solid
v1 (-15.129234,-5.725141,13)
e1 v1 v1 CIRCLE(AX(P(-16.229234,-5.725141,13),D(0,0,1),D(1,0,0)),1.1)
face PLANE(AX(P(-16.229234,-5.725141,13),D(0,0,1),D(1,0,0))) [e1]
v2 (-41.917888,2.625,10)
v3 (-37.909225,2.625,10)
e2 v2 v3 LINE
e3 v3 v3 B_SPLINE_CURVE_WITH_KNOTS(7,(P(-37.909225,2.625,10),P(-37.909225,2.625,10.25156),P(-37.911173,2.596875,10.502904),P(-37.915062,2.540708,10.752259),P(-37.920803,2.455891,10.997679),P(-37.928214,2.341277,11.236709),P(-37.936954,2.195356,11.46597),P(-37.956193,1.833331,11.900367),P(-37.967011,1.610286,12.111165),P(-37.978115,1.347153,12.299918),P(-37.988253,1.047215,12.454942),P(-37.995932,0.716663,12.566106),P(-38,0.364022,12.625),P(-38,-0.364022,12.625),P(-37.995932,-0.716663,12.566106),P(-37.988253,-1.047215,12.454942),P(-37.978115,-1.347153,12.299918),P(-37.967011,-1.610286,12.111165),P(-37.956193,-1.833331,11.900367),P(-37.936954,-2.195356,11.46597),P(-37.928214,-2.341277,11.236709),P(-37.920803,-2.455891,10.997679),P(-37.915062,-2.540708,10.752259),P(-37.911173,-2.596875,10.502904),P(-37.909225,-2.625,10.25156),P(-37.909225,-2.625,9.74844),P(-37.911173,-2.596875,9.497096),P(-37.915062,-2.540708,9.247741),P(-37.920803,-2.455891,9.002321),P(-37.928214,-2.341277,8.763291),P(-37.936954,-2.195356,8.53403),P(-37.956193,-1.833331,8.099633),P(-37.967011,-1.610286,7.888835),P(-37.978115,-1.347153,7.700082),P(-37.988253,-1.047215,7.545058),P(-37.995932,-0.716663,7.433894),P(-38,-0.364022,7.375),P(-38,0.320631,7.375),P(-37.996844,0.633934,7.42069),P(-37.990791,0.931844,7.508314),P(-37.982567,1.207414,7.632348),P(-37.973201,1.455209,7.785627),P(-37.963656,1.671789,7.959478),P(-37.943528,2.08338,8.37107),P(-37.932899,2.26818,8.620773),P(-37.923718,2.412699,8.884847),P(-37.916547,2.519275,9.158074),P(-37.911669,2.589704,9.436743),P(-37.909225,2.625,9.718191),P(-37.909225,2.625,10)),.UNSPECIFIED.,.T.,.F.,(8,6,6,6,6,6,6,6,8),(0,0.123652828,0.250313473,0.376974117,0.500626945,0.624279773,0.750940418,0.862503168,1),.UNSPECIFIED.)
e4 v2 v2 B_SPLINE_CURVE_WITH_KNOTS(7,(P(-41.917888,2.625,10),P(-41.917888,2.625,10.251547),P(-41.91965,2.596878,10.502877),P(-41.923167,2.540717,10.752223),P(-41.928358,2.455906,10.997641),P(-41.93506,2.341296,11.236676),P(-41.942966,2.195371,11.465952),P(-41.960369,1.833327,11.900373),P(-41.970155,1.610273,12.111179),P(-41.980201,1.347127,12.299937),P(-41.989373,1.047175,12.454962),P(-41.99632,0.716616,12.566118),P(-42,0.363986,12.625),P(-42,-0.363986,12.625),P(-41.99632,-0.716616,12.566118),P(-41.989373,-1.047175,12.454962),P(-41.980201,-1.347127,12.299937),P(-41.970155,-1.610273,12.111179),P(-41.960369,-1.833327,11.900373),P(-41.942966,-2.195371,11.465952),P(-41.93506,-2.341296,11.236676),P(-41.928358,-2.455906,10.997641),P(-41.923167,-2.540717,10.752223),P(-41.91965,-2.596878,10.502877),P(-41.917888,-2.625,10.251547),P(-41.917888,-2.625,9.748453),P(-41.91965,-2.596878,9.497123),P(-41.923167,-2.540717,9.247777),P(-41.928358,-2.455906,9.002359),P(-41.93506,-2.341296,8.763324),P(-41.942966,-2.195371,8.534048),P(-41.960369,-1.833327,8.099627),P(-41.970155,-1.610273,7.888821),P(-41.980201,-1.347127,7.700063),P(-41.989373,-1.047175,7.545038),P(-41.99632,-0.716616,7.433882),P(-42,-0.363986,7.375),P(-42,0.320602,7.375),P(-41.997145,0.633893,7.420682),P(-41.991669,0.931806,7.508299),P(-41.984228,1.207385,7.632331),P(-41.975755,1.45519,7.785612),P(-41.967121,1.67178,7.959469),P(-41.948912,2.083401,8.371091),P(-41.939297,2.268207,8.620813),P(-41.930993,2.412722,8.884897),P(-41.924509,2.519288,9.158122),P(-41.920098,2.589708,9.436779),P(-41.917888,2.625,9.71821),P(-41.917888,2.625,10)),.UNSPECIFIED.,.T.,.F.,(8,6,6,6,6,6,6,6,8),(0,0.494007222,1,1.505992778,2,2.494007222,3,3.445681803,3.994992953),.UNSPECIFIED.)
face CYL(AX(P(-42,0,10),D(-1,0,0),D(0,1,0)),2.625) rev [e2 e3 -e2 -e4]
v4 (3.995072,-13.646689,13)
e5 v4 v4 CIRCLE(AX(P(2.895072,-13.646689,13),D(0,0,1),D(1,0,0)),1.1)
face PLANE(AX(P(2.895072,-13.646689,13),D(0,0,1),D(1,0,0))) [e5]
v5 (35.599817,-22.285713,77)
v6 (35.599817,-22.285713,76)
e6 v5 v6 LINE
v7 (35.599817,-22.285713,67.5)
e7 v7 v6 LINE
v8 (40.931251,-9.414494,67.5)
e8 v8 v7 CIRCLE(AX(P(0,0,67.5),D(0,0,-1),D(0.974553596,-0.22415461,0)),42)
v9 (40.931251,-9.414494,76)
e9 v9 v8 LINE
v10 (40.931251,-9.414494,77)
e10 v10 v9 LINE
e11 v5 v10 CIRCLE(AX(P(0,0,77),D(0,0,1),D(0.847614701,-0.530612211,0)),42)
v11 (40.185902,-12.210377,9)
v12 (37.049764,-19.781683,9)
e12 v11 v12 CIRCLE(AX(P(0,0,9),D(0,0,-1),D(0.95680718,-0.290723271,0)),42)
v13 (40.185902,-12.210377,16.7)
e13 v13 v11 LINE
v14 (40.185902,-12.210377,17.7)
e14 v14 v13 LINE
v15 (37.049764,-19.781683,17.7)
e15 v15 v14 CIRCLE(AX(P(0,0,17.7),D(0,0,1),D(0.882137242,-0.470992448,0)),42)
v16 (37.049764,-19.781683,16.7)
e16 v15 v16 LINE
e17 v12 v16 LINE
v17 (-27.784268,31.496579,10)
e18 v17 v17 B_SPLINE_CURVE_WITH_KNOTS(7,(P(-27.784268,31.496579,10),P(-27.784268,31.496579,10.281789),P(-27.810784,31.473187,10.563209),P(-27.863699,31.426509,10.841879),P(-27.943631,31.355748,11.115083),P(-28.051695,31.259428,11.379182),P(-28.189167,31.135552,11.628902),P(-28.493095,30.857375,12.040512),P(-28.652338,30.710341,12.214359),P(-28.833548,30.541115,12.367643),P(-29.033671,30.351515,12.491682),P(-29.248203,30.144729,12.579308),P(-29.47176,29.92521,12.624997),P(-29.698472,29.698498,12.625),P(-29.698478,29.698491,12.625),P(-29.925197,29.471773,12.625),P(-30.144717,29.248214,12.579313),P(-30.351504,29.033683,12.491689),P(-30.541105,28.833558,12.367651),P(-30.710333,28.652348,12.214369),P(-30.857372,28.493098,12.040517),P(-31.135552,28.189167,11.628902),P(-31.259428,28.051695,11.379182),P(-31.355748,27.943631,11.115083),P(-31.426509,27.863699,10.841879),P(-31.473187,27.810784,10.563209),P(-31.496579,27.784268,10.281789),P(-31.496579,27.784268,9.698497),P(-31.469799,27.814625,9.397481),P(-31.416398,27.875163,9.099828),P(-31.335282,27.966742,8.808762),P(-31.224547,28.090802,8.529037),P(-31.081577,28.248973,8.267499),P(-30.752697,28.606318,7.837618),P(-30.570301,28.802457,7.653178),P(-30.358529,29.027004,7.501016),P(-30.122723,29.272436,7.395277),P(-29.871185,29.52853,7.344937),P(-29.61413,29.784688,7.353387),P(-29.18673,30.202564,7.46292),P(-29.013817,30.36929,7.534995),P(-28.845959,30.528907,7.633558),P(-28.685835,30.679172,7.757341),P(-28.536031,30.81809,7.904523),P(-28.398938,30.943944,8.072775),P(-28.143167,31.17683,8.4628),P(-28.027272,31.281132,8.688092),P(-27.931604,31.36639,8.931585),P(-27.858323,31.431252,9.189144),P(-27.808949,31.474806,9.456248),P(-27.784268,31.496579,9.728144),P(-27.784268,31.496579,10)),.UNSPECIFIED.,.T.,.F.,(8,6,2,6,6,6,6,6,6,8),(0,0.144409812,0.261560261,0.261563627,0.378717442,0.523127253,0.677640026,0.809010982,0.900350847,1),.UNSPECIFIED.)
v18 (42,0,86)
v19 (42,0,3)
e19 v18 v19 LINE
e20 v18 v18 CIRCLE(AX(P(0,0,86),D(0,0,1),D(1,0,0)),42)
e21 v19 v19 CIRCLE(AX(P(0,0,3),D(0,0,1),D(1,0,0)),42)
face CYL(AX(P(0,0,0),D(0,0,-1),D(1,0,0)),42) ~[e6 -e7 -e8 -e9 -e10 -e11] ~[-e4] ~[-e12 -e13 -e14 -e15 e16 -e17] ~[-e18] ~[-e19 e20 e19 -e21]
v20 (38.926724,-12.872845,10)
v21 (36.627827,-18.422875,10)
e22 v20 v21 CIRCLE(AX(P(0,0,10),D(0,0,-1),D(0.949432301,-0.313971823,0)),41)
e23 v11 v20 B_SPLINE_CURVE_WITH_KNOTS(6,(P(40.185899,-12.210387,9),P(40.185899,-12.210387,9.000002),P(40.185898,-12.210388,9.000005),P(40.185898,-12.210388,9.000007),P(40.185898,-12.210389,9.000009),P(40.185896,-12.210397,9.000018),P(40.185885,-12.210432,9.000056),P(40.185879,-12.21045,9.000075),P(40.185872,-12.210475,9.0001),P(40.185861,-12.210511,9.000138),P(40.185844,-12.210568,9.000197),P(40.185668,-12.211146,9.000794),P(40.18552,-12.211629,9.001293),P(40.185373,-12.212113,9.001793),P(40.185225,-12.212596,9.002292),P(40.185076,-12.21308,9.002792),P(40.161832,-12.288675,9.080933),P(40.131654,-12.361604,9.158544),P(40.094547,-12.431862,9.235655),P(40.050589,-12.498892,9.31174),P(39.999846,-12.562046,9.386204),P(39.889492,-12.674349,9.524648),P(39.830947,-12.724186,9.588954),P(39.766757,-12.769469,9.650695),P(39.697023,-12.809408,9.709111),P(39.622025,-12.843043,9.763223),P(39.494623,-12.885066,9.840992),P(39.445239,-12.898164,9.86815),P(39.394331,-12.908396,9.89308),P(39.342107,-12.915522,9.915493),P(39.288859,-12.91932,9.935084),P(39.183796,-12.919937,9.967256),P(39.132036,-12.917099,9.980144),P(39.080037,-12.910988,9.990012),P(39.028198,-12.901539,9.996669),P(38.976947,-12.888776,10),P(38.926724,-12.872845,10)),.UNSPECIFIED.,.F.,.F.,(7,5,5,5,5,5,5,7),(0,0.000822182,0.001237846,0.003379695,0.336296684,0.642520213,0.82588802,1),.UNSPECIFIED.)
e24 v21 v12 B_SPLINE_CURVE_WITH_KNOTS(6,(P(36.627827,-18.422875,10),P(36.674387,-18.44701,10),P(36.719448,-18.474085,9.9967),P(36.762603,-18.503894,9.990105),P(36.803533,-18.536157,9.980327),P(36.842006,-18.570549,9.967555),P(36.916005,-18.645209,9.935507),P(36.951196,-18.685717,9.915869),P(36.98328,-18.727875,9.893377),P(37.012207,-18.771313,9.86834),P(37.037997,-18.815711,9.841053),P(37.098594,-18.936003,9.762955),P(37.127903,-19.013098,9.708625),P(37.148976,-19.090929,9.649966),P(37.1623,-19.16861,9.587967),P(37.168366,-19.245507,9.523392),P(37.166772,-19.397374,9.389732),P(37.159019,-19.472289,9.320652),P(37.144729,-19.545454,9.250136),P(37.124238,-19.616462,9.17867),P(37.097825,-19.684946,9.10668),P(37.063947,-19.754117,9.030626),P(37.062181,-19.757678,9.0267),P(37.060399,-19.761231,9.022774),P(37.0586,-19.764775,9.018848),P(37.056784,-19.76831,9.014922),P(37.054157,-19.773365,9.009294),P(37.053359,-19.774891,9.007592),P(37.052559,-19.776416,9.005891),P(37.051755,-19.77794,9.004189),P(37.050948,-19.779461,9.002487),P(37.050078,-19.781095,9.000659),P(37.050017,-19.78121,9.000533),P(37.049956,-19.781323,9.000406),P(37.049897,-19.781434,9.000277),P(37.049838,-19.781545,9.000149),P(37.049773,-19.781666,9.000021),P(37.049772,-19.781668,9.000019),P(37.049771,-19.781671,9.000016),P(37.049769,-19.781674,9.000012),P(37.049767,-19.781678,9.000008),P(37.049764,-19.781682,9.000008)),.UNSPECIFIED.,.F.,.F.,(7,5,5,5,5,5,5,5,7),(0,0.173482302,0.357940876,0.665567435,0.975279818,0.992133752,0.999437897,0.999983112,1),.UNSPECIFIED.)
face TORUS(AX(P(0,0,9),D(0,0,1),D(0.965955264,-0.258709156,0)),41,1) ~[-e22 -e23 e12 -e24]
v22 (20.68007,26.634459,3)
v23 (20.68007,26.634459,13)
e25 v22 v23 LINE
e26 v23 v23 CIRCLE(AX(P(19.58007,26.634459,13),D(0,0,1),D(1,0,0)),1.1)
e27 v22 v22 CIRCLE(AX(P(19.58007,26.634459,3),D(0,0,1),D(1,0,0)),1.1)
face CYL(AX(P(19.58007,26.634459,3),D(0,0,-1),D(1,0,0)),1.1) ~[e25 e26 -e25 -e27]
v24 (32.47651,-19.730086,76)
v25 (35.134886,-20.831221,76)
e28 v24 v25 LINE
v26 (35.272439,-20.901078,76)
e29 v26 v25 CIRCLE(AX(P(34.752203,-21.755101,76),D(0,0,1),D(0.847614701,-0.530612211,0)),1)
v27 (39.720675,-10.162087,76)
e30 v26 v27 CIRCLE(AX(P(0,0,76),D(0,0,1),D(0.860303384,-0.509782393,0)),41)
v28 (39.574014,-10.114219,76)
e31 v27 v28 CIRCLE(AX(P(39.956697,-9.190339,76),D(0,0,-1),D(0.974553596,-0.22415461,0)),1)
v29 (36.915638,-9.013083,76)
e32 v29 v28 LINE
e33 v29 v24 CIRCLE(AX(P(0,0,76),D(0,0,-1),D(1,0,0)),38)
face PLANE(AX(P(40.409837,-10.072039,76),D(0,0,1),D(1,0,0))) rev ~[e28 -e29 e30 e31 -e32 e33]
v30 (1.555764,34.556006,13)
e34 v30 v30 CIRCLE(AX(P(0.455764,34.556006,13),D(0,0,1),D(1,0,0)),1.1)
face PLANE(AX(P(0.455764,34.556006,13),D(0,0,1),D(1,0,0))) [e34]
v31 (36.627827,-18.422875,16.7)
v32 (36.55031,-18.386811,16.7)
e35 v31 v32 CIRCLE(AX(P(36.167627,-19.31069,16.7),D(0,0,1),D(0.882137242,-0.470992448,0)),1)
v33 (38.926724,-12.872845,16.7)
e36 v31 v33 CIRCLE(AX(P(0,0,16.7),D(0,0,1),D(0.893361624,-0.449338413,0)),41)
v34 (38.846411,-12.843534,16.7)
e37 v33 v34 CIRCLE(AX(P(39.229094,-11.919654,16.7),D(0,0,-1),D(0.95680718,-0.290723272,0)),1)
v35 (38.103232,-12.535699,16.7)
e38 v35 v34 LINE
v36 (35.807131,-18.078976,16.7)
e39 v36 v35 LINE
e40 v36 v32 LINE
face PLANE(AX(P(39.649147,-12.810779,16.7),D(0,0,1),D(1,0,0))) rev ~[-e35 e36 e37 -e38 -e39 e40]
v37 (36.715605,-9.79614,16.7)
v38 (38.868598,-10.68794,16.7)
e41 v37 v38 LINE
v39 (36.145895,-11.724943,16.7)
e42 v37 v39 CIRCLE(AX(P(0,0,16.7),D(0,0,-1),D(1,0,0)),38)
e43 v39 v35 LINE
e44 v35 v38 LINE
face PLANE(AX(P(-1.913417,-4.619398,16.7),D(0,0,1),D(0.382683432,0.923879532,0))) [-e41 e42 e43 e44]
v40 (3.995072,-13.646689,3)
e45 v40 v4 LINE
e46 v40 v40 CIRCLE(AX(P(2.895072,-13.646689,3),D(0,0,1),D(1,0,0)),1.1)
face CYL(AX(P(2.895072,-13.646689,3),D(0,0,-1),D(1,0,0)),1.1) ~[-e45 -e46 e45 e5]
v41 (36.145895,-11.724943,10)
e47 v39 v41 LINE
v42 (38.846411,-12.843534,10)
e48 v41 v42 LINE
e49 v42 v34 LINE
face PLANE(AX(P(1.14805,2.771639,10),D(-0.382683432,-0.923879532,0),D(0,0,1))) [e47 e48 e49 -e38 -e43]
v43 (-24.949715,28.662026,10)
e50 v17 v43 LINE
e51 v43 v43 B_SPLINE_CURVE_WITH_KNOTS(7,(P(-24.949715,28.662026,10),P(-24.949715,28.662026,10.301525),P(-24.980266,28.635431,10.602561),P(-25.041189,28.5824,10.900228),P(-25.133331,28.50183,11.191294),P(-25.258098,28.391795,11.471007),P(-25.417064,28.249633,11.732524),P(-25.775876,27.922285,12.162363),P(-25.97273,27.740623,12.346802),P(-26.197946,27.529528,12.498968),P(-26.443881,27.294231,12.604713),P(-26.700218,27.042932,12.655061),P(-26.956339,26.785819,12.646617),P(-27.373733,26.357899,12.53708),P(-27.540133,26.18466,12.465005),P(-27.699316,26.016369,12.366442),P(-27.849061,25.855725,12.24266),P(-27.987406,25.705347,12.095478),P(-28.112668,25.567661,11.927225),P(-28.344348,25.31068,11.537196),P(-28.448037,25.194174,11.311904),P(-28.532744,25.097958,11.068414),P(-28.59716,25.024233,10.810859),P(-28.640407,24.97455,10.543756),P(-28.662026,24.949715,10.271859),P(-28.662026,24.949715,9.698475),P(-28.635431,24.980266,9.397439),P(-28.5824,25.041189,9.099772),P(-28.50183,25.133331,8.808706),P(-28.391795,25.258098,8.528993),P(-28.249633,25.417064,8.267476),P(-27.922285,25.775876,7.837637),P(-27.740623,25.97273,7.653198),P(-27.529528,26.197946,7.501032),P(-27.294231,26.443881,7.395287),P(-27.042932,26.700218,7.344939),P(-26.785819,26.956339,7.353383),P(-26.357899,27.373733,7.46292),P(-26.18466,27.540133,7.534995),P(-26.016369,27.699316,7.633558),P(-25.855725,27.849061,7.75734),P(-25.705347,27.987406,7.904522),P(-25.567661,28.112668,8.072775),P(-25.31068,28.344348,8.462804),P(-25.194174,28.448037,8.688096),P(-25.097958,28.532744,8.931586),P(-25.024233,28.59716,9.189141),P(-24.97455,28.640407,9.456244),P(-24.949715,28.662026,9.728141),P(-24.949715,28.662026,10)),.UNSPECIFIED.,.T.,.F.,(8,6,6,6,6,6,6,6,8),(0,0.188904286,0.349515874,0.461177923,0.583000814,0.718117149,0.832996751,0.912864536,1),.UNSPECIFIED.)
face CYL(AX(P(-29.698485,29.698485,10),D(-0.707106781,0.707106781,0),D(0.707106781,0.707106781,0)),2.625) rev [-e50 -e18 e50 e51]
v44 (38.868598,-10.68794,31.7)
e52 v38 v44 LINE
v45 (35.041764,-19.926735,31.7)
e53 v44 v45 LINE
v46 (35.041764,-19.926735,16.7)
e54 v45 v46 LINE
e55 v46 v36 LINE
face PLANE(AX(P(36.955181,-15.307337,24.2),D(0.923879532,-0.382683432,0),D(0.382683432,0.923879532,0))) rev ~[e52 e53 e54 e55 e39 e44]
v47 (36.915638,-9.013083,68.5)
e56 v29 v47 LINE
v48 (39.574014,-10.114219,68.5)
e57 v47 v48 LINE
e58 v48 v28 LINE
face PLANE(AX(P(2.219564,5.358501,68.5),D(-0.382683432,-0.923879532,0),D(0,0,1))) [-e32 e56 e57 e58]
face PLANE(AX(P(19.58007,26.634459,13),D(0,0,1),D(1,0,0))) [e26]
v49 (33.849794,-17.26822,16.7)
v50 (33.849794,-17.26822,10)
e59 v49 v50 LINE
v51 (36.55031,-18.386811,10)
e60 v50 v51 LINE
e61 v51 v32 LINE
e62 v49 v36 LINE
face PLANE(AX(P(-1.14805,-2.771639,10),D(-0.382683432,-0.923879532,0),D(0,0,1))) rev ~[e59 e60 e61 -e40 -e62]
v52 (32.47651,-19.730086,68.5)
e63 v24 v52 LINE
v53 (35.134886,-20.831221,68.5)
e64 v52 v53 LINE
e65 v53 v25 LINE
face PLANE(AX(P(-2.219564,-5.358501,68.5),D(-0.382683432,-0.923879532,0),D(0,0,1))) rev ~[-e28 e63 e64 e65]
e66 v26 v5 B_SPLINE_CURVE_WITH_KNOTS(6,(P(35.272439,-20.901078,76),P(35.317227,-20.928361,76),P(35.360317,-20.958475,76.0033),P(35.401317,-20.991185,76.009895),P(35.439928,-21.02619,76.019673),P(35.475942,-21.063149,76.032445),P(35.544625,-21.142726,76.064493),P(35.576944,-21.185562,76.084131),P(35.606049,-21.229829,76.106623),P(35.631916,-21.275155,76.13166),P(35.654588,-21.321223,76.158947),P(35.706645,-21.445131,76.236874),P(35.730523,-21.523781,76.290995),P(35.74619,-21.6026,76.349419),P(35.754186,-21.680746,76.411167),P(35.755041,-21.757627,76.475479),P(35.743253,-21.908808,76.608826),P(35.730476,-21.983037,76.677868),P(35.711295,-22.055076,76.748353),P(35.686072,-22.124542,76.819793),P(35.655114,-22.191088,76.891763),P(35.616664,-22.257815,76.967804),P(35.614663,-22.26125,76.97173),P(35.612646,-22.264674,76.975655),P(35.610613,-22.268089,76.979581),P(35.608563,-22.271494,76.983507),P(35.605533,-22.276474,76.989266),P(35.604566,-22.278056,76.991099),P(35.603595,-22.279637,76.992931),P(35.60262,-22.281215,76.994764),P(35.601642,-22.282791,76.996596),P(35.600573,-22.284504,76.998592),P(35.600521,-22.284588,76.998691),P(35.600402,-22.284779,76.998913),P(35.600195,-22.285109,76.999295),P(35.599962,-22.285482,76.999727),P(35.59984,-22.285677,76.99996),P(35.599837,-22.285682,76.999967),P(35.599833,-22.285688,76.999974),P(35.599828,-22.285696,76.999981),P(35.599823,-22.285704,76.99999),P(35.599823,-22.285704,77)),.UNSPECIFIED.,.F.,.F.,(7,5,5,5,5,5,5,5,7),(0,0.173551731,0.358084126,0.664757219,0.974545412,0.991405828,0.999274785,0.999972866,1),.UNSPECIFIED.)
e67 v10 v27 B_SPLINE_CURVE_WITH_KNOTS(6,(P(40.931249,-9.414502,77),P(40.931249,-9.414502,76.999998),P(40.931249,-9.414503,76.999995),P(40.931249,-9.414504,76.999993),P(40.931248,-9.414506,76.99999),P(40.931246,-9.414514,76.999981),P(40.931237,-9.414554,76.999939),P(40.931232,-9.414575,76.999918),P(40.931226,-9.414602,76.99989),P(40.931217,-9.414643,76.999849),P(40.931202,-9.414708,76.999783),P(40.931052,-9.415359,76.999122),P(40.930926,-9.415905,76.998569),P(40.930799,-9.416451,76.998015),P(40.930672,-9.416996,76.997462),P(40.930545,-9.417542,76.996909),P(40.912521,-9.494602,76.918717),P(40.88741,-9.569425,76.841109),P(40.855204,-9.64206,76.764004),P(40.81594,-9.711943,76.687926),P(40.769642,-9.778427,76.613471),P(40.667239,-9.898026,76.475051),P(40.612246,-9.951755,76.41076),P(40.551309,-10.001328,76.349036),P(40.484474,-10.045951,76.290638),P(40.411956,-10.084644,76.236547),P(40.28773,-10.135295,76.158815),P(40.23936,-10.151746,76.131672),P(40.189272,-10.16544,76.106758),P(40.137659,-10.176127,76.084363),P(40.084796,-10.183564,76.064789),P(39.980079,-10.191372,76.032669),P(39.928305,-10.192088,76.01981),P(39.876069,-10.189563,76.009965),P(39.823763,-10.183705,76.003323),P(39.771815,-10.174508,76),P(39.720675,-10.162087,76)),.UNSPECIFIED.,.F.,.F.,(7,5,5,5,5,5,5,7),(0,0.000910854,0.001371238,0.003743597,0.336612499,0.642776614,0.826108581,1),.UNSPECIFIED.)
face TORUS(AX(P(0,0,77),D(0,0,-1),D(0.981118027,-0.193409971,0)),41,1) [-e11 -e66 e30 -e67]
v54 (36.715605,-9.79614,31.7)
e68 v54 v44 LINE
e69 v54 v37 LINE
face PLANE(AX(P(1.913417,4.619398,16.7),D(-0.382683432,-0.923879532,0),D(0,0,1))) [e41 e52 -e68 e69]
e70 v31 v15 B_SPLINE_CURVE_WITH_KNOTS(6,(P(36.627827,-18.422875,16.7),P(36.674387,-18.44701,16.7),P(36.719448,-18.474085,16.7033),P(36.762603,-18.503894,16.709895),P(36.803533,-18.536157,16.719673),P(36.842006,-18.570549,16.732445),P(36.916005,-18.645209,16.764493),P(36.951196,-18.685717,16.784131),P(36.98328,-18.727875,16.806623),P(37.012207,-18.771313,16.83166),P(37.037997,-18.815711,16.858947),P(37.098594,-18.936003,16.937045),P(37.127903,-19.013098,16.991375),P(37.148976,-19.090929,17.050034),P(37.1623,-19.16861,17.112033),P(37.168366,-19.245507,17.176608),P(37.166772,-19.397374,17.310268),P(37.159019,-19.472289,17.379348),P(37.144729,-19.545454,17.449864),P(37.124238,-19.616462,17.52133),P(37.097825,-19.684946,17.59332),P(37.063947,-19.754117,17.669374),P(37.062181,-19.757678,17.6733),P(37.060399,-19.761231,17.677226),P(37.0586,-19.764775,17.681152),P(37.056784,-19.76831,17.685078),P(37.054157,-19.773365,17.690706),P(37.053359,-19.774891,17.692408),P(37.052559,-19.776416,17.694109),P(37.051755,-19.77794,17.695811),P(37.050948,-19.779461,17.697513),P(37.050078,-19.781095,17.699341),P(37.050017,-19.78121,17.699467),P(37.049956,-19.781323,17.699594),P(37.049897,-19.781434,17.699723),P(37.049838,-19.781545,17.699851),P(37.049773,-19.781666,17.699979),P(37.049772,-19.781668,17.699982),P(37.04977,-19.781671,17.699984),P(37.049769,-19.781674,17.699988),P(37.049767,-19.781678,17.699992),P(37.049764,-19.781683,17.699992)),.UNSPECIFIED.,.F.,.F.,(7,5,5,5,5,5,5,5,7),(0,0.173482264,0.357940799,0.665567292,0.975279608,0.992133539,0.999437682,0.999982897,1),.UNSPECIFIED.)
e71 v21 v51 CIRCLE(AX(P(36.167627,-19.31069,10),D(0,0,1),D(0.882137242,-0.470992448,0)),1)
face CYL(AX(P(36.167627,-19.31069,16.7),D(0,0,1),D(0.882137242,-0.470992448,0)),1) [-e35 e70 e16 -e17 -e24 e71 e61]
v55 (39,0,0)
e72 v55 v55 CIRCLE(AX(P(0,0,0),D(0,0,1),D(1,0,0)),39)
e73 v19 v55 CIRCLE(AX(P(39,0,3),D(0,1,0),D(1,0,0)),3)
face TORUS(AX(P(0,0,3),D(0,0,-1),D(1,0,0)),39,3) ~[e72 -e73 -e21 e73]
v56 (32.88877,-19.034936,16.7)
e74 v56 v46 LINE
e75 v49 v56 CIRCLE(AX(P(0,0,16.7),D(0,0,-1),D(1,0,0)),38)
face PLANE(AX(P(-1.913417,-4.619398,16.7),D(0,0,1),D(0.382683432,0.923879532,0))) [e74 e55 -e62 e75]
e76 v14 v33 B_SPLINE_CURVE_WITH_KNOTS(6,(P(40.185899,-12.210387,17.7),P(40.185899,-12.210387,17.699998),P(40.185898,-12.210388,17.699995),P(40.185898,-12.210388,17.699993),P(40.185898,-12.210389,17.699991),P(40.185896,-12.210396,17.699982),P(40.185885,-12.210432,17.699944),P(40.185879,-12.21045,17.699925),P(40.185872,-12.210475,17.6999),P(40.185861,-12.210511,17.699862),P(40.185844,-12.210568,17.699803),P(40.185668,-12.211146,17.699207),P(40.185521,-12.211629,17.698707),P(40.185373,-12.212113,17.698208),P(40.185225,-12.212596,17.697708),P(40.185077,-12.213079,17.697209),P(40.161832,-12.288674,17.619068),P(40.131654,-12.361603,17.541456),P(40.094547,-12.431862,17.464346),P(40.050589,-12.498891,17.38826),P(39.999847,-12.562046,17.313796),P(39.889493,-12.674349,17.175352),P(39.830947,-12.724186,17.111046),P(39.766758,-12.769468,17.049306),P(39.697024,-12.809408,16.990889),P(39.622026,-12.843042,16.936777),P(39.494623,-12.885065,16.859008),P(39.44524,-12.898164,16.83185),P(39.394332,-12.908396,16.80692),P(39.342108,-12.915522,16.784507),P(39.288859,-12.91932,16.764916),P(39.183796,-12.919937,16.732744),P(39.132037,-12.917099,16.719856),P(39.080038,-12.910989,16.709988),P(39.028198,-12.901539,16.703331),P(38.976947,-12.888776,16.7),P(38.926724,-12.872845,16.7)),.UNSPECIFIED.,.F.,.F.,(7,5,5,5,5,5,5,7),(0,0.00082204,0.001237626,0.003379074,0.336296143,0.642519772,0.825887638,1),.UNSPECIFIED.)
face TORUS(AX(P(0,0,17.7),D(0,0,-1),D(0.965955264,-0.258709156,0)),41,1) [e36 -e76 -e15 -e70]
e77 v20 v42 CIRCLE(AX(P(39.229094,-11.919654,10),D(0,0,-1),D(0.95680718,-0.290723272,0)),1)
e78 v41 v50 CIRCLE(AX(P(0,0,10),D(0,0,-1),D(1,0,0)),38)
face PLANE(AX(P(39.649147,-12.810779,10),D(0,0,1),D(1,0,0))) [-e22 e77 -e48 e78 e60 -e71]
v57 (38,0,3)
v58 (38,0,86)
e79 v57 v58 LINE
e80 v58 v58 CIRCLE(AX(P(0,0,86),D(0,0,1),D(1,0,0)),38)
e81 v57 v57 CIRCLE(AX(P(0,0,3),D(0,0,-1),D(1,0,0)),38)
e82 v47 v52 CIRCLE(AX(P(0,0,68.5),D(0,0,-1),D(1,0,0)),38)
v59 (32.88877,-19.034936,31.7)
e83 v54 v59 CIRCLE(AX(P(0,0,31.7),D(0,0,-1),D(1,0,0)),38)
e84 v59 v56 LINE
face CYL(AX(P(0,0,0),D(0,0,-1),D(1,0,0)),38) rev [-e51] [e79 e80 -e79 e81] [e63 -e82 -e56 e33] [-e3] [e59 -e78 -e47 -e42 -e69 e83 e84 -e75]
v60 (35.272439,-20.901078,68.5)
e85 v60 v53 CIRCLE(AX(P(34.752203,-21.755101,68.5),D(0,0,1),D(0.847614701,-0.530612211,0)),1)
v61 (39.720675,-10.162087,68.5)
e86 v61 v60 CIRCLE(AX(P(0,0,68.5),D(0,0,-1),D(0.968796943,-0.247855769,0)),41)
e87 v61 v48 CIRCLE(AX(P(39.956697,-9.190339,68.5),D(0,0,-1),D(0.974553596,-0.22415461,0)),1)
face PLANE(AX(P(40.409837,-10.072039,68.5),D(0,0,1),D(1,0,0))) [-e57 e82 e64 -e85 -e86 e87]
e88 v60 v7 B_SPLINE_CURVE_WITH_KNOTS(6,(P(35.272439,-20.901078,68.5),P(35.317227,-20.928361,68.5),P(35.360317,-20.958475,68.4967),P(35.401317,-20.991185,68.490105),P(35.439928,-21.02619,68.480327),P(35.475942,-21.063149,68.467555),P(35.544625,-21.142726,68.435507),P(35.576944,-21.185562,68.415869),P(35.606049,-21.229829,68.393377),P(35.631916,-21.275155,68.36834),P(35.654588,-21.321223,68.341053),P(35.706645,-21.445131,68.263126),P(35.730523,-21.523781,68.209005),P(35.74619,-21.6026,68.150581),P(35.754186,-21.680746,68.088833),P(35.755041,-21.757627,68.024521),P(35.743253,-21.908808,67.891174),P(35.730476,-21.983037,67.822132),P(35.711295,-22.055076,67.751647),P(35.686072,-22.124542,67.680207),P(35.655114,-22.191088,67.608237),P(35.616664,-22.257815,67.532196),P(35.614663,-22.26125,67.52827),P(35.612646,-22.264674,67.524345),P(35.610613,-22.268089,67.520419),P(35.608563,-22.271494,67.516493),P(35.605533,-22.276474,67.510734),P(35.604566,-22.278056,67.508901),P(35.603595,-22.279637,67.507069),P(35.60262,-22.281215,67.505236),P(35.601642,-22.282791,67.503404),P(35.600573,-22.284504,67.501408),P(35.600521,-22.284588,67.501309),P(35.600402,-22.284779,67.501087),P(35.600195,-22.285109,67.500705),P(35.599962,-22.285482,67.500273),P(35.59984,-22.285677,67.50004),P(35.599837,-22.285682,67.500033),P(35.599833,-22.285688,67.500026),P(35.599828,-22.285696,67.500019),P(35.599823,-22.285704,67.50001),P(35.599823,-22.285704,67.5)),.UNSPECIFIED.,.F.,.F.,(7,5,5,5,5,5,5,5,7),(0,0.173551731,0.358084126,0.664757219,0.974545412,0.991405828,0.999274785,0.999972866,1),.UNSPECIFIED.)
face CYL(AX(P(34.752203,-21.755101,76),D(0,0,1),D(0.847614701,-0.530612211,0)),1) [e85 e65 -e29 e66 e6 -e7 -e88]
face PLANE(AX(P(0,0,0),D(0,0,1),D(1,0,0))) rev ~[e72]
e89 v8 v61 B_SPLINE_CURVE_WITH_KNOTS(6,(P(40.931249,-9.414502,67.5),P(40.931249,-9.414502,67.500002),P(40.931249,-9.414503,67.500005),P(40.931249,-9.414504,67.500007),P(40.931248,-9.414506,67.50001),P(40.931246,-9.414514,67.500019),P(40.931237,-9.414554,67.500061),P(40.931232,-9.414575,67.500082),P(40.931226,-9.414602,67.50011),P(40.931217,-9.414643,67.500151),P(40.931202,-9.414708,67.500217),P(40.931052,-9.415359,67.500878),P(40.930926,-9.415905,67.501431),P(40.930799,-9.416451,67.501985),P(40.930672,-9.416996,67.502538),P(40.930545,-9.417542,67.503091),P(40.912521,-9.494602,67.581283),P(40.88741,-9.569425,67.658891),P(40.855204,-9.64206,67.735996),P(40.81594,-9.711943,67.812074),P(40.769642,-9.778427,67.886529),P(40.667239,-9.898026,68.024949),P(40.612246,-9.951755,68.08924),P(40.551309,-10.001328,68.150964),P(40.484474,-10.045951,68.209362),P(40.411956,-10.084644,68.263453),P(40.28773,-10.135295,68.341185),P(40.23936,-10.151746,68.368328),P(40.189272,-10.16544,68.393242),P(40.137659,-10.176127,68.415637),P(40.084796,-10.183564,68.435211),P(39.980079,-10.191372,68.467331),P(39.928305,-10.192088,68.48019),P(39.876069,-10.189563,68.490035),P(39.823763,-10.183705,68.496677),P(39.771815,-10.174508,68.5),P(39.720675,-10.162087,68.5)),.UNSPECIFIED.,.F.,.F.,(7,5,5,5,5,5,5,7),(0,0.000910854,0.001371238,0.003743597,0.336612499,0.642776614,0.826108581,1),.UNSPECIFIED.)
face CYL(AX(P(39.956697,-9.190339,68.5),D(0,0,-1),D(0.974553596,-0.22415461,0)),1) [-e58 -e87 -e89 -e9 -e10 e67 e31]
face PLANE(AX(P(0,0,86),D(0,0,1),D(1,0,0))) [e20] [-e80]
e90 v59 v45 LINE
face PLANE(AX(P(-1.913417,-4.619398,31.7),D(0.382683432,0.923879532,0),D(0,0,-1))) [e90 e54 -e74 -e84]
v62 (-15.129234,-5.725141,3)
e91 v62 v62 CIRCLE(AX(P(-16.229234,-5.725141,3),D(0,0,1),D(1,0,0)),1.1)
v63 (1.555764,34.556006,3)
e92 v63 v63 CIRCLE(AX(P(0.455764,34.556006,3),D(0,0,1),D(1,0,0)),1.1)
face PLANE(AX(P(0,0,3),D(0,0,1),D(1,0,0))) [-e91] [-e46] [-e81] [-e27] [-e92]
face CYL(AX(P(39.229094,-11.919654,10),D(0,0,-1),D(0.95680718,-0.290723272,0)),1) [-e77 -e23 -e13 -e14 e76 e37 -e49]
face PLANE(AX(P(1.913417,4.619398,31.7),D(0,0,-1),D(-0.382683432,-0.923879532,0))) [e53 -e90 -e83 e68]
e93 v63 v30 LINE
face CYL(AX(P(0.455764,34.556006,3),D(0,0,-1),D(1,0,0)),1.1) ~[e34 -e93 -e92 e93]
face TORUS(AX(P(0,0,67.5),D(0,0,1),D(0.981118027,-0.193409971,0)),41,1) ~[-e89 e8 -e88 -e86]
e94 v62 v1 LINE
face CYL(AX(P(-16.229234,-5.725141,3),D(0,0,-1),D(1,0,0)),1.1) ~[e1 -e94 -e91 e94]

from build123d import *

# Parameters (mm, degrees)
F0_R           = 42
F0_R_2         = 38
F1_DEPTH       = 86
F2_DEPTH       = 3
F7_R           = 2.625
F8_DEPTH       = 4.0917746397
F9_R           = 2.625
F10_DEPTH      = 4.0917746397
F11_R          = 3
F14_W          = 11.6
F14_H          = 7.5
F14_W_2        = 6
F14_H_2        = 6.7
F15_DEPTH      = 54.8766446555
F16_R          = 1.1
F17_DEPTH      = 10
F18_T1_DEPTH   = 7.5
F18_T3_DEPTH   = 6.7
F18_T8_ANGLE   = 22.6962930478
F18_T14_ANGLE  = 22.6962930478
F18_T20_ANGLE  = 15.0130363442
F18_T26_ANGLE  = 15.0130363442
F18_T33_DEPTH  = 10.4488940484
F18_T37_ANGLE  = 22.6962930478
F18_T44_ANGLE  = 22.6962930478
F18_T48_DEPTH  = 10.4488940484
F18_T55_DEPTH  = 10.4488940484
F18_T59_ANGLE  = 22.6962930478
F18_T66_DEPTH  = 10.4488940484
F18_T70_ANGLE  = 22.6962930478
F18_T77_ANGLE  = 15.0130363442
F18_T81_DEPTH  = 9.4537517655
F18_T88_ANGLE  = 15.0130363442
F18_T92_DEPTH  = 9.4537517655
F18_T99_ANGLE  = 15.0130363442
F18_T103_DEPTH = 9.4537517655
F18_T110_DEPTH = 9.4537517655
F18_T114_ANGLE = 15.0130363442
F19_DEPTH      = 40


# Not quite as in the source:
# - a fillet or chamfer that OpenCascade refuses, or shapes differently, is made with other operations: its cross-section is extruded or revolved along the edge and cut away or added


with BuildPart() as f1:
    # F0 (on Top) → F1 (new body)
    with BuildSketch(Plane.XY):
        Circle(F0_R)
        Circle(F0_R_2, mode=Mode.SUBTRACT)
    extrude(amount=F1_DEPTH)

    # F0 (on Top) → F2 (join)
    with BuildSketch(Plane.XY):
        Circle(F0_R)
        Circle(F0_R_2, mode=Mode.SUBTRACT)
        Circle(F0_R_2)
    extrude(amount=F2_DEPTH)

    # F7 (on plane+point) → F8 (cut, through all)
    with BuildSketch(Plane.YZ.offset(-42)):
        with Locations((0, 10)):
            Circle(F7_R)
    extrude(amount=F8_DEPTH, mode=Mode.SUBTRACT)

    # F9 (on face) → F10 (cut, through all)
    with BuildSketch(Plane(origin=(-29.6984848098, 29.6984848098, 0), x_dir=(0.7071067812, 0.7071067812, 0), z_dir=(0.7071067812, -0.7071067812, 0))):
        with Locations((0, 10)):
            Circle(F9_R)
    extrude(amount=F10_DEPTH, mode=Mode.SUBTRACT)

    # F11
    f11_edges = [f1.edges().sort_by_distance(p)[0] for p in [
        (-42, 0, 0),
    ]]
    fillet(f11_edges, radius=F11_R)

    # F14 (on face) → F15 (cut, through all)
    with BuildSketch(Plane(origin=(0, 0, 0), x_dir=(0.3826834324, 0.9238795325, 0), z_dir=(0.9238795325, -0.3826834324, 0))):
        with Locations((0, 72.25)):
            Rectangle(F14_W, F14_H)
        with Locations((0, 13.35)):
            Rectangle(F14_W_2, F14_H_2)
    extrude(amount=F15_DEPTH, mode=Mode.SUBTRACT)

    # F16 (on face) → F17 (join)
    with BuildSketch(Plane.XY.offset(3)):
        with Locations((19.5800699423, 26.6344591071)):
            Circle(F16_R)
        with Locations((2.8950722912, -13.6466885104)):
            Circle(F16_R)
        with Locations((-16.2292340318, -5.7251414605)):
            Circle(F16_R)
        with Locations((0.4557636193, 34.556006157)):
            Circle(F16_R)
    extrude(amount=F17_DEPTH)

    # F18: fillet of radius 1 on 8 edges, made by hand

    # F18_s2 → F18_t1 (cut)
    with BuildSketch(Plane.XY.offset(68.5)):
        with BuildLine():
            ThreePointArc((35.5998174413, -22.2857128706), (35.7047230458, -21.4506255904), (35.1348861726, -20.8312211268))
            Line((35.1348861726, -20.8312211268), (36.2116037163, -21.2772121363))
            ThreePointArc((36.2116037163, -21.2772121363), (35.9092511841, -21.783610339), (35.5998174413, -22.2857128706))
        make_face()
        with BuildLine():
            ThreePointArc((40.9312510161, -9.4144936274), (40.4149346017, -10.0791689704), (39.5740139881, -10.1142185497))
            Line((39.5740139881, -10.1142185497), (40.6507315318, -10.5602095591))
            ThreePointArc((40.6507315318, -10.5602095591), (40.795013609, -9.9883364302), (40.9312510161, -9.4144936274))
        make_face()
    extrude(amount=F18_T1_DEPTH, mode=Mode.SUBTRACT)

    # F18_s4 → F18_t3 (cut)
    with BuildSketch(Plane.XY.offset(10)):
        with BuildLine():
            ThreePointArc((40.1859015546, -12.2103773999), (39.6564422799, -12.8237413852), (38.8464109423, -12.843533661))
            Line((38.8464109423, -12.843533661), (39.8518769876, -13.2600113334))
            ThreePointArc((39.8518769876, -13.2600113334), (40.0223304087, -12.7362894384), (40.1859015546, -12.2103773999))
        make_face()
        with BuildLine():
            ThreePointArc((37.0497641576, -19.781682837), (37.1090937475, -18.9735847602), (36.5503103481, -18.386810856))
            Line((36.5503103481, -18.386810856), (37.5557763934, -18.8032885285))
            ThreePointArc((37.5557763934, -18.8032885285), (37.3059778599, -19.2941446018), (37.0497641576, -19.781682837))
        make_face()
    extrude(amount=F18_T3_DEPTH, mode=Mode.SUBTRACT)


with BuildPart() as f18_tool6:
    # F18_s7 → F18_t8 (revolve)
    with BuildSketch(Plane(origin=(0, 0, 0), x_dir=(0, 0, 1), z_dir=(0.193409971, 0.9811180271, 0))):
        with BuildLine():
            ThreePointArc((67.5, 42), (68.2071067812, 41.7071067812), (68.5, 41))
            Line((68.5, 41), (68.5, 42))
            Line((68.5, 42), (67.5, 42))
        make_face()
    revolve(axis=Axis((0, 0, 68.5), (0, 0, -1)), revolution_arc=F18_T8_ANGLE)

    split(bisect_by=Plane(origin=(2.2195639077, 5.3585012886, 0), x_dir=(0, 0, 1), z_dir=(-0.3826834324, -0.9238795325, 0)), keep=Keep.TOP)

    split(bisect_by=Plane(origin=(-2.2195639077, -5.3585012886, 0), x_dir=(0, 0, 1), z_dir=(0.3826834324, 0.9238795325, 0)), keep=Keep.TOP)


with BuildPart() as f1_1:
    add(f1.part)

    # F18_t5: cut F18_tool6
    add(f18_tool6.part, mode=Mode.SUBTRACT)


with BuildPart() as f18_tool12:
    # F18_s13 → F18_t14 (revolve)
    with BuildSketch(Plane(origin=(0, 0, 0), x_dir=(0, 0, 1), z_dir=(0.193409971, 0.9811180271, 0))):
        with BuildLine():
            ThreePointArc((77, 42), (76.2928932188, 41.7071067812), (76, 41))
            Line((76, 41), (76, 42))
            Line((76, 42), (77, 42))
        make_face()
    revolve(axis=Axis((0, 0, 76), (0, 0, -1)), revolution_arc=F18_T14_ANGLE)

    split(bisect_by=Plane(origin=(2.2195639077, 5.3585012886, 0), x_dir=(0, 0, 1), z_dir=(-0.3826834324, -0.9238795325, 0)), keep=Keep.TOP)

    split(bisect_by=Plane(origin=(-2.2195639077, -5.3585012886, 0), x_dir=(0, 0, 1), z_dir=(0.3826834324, 0.9238795325, 0)), keep=Keep.TOP)


with BuildPart() as f1_2:
    add(f1_1.part)

    # F18_t11: cut F18_tool12
    add(f18_tool12.part, mode=Mode.SUBTRACT)


with BuildPart() as f18_tool18:
    # F18_s19 → F18_t20 (revolve)
    with BuildSketch(Plane(origin=(0, 0, 0), x_dir=(0, 0, 1), z_dir=(0.2587091563, 0.9659552642, 0))):
        with BuildLine():
            ThreePointArc((9, 42), (9.7071067812, 41.7071067812), (10, 41))
            Line((10, 41), (10, 42))
            Line((10, 42), (9, 42))
        make_face()
    revolve(axis=Axis((0, 0, 10), (0, 0, -1)), revolution_arc=F18_T20_ANGLE)

    split(bisect_by=Plane(origin=(1.1480502971, 2.7716385975, 0), x_dir=(0, 0, 1), z_dir=(-0.3826834324, -0.9238795325, 0)), keep=Keep.TOP)

    split(bisect_by=Plane(origin=(-1.1480502971, -2.7716385975, 0), x_dir=(0, 0, 1), z_dir=(0.3826834324, 0.9238795325, 0)), keep=Keep.TOP)


with BuildPart() as f1_3:
    add(f1_2.part)

    # F18_t17: cut F18_tool18
    add(f18_tool18.part, mode=Mode.SUBTRACT)


with BuildPart() as f18_tool24:
    # F18_s25 → F18_t26 (revolve)
    with BuildSketch(Plane(origin=(0, 0, 0), x_dir=(0, 0, 1), z_dir=(0.2587091563, 0.9659552642, 0))):
        with BuildLine():
            ThreePointArc((17.7, 42), (16.9928932188, 41.7071067812), (16.7, 41))
            Line((16.7, 41), (16.7, 42))
            Line((16.7, 42), (17.7, 42))
        make_face()
    revolve(axis=Axis((0, 0, 16.7), (0, 0, -1)), revolution_arc=F18_T26_ANGLE)

    split(bisect_by=Plane(origin=(-1.1480502971, -2.7716385975, 0), x_dir=(0, 0, 1), z_dir=(0.3826834324, 0.9238795325, 0)), keep=Keep.TOP)

    split(bisect_by=Plane(origin=(1.1480502971, 2.7716385975, 0), x_dir=(0, 0, 1), z_dir=(-0.3826834324, -0.9238795325, 0)), keep=Keep.TOP)


with BuildPart() as f1_4:
    add(f1_3.part)

    # F18_t23: cut F18_tool24
    add(f18_tool24.part, mode=Mode.SUBTRACT)


with BuildPart() as f18_tool31:
    # F18_s32 → F18_t33 (new body)
    with BuildSketch(Plane.XY.offset(76)):
        with BuildLine():
            ThreePointArc((40.9312510161, -9.4144936274), (40.4149346017, -10.0791689704), (39.5740139881, -10.1142185497))
            Line((39.5740139881, -10.1142185497), (40.6507315318, -10.5602095591))
            ThreePointArc((40.6507315318, -10.5602095591), (40.795013609, -9.9883364302), (40.9312510161, -9.4144936274))
        make_face()
    extrude(amount=-F18_T33_DEPTH)

    split(bisect_by=Plane.XY.offset(68.5), keep=Keep.BOTTOM)


with BuildPart() as f18_tool35:
    # F18_s36 → F18_t37 (revolve)
    with BuildSketch(Plane(origin=(0, 0, 0), x_dir=(0, 0, 1), z_dir=(0.193409971, 0.9811180271, 0))):
        with BuildLine():
            ThreePointArc((67.5, 42), (68.2071067812, 41.7071067812), (68.5, 41))
            Line((68.5, 41), (68.5, 42))
            Line((68.5, 42), (67.5, 42))
        make_face()
    revolve(axis=Axis((0, 0, 68.5), (0, 0, -1)), revolution_arc=F18_T37_ANGLE)

    split(bisect_by=Plane(origin=(2.2195639077, 5.3585012886, 0), x_dir=(0, 0, 1), z_dir=(0.3826834324, 0.9238795325, 0)), keep=Keep.TOP)


with BuildPart() as f18_tool31_1:
    add(f18_tool31.part)

    # F18_t39: intersect F18_tool35
    add(f18_tool35.part, mode=Mode.INTERSECT)


with BuildPart() as f1_5:
    add(f1_4.part)

    # F18_t29: cut F18_tool31
    add(f18_tool31_1.part, mode=Mode.SUBTRACT)


with BuildPart() as f18_tool42:
    # F18_s43 → F18_t44 (revolve)
    with BuildSketch(Plane(origin=(0, 0, 0), x_dir=(0, 0, 1), z_dir=(0.193409971, 0.9811180271, 0))):
        with BuildLine():
            ThreePointArc((67.5, 42), (68.2071067812, 41.7071067812), (68.5, 41))
            Line((68.5, 41), (68.5, 42))
            Line((68.5, 42), (67.5, 42))
        make_face()
    revolve(axis=Axis((0, 0, 68.5), (0, 0, -1)), revolution_arc=F18_T44_ANGLE)

    split(bisect_by=Plane(origin=(-2.2195639077, -5.3585012886, 0), x_dir=(0, 0, 1), z_dir=(-0.3826834324, -0.9238795325, 0)), keep=Keep.TOP)


with BuildPart() as f18_tool46:
    # F18_s47 → F18_t48 (new body)
    with BuildSketch(Plane.XY.offset(76)):
        with BuildLine():
            ThreePointArc((35.5998174413, -22.2857128706), (35.7047230458, -21.4506255904), (35.1348861726, -20.8312211268))
            Line((35.1348861726, -20.8312211268), (36.2116037163, -21.2772121363))
            ThreePointArc((36.2116037163, -21.2772121363), (35.9092511841, -21.783610339), (35.5998174413, -22.2857128706))
        make_face()
    extrude(amount=-F18_T48_DEPTH)

    split(bisect_by=Plane.XY.offset(68.5), keep=Keep.BOTTOM)


with BuildPart() as f18_tool42_1:
    add(f18_tool42.part)

    # F18_t50: intersect F18_tool46
    add(f18_tool46.part, mode=Mode.INTERSECT)


with BuildPart() as f1_6:
    add(f1_5.part)

    # F18_t40: cut F18_tool42
    add(f18_tool42_1.part, mode=Mode.SUBTRACT)


with BuildPart() as f18_tool53:
    # F18_s54 → F18_t55 (new body)
    with BuildSketch(Plane.XY.offset(78.9488940484)):
        with BuildLine():
            ThreePointArc((35.5998174413, -22.2857128706), (35.7047230458, -21.4506255904), (35.1348861726, -20.8312211268))
            Line((35.1348861726, -20.8312211268), (36.2116037163, -21.2772121363))
            ThreePointArc((36.2116037163, -21.2772121363), (35.9092511841, -21.783610339), (35.5998174413, -22.2857128706))
        make_face()
    extrude(amount=-F18_T55_DEPTH)

    split(bisect_by=Plane.XY.offset(76), keep=Keep.TOP)


with BuildPart() as f18_tool57:
    # F18_s58 → F18_t59 (revolve)
    with BuildSketch(Plane(origin=(0, 0, 0), x_dir=(0, 0, 1), z_dir=(0.193409971, 0.9811180271, 0))):
        with BuildLine():
            ThreePointArc((77, 42), (76.2928932188, 41.7071067812), (76, 41))
            Line((76, 41), (76, 42))
            Line((76, 42), (77, 42))
        make_face()
    revolve(axis=Axis((0, 0, 76), (0, 0, -1)), revolution_arc=F18_T59_ANGLE)

    split(bisect_by=Plane(origin=(-2.2195639077, -5.3585012886, 0), x_dir=(0, 0, 1), z_dir=(-0.3826834324, -0.9238795325, 0)), keep=Keep.TOP)


with BuildPart() as f18_tool53_1:
    add(f18_tool53.part)

    # F18_t61: intersect F18_tool57
    add(f18_tool57.part, mode=Mode.INTERSECT)


with BuildPart() as f1_7:
    add(f1_6.part)

    # F18_t51: cut F18_tool53
    add(f18_tool53_1.part, mode=Mode.SUBTRACT)


with BuildPart() as f18_tool64:
    # F18_s65 → F18_t66 (new body)
    with BuildSketch(Plane.XY.offset(78.9488940484)):
        with BuildLine():
            ThreePointArc((40.9312510161, -9.4144936274), (40.4149346017, -10.0791689704), (39.5740139881, -10.1142185497))
            Line((39.5740139881, -10.1142185497), (40.6507315318, -10.5602095591))
            ThreePointArc((40.6507315318, -10.5602095591), (40.795013609, -9.9883364302), (40.9312510161, -9.4144936274))
        make_face()
    extrude(amount=-F18_T66_DEPTH)

    split(bisect_by=Plane.XY.offset(76), keep=Keep.TOP)


with BuildPart() as f18_tool68:
    # F18_s69 → F18_t70 (revolve)
    with BuildSketch(Plane(origin=(0, 0, 0), x_dir=(0, 0, 1), z_dir=(0.193409971, 0.9811180271, 0))):
        with BuildLine():
            ThreePointArc((77, 42), (76.2928932188, 41.7071067812), (76, 41))
            Line((76, 41), (76, 42))
            Line((76, 42), (77, 42))
        make_face()
    revolve(axis=Axis((0, 0, 76), (0, 0, -1)), revolution_arc=F18_T70_ANGLE)

    split(bisect_by=Plane(origin=(2.2195639077, 5.3585012886, 0), x_dir=(0, 0, 1), z_dir=(0.3826834324, 0.9238795325, 0)), keep=Keep.TOP)


with BuildPart() as f18_tool64_1:
    add(f18_tool64.part)

    # F18_t72: intersect F18_tool68
    add(f18_tool68.part, mode=Mode.INTERSECT)


with BuildPart() as f1_8:
    add(f1_7.part)

    # F18_t62: cut F18_tool64
    add(f18_tool64_1.part, mode=Mode.SUBTRACT)


with BuildPart() as f18_tool75:
    # F18_s76 → F18_t77 (revolve)
    with BuildSketch(Plane(origin=(0, 0, 0), x_dir=(0, 0, 1), z_dir=(0.2587091563, 0.9659552642, 0))):
        with BuildLine():
            ThreePointArc((9, 42), (9.7071067812, 41.7071067812), (10, 41))
            Line((10, 41), (10, 42))
            Line((10, 42), (9, 42))
        make_face()
    revolve(axis=Axis((0, 0, 10), (0, 0, -1)), revolution_arc=F18_T77_ANGLE)

    split(bisect_by=Plane(origin=(1.1480502971, 2.7716385975, 0), x_dir=(0, 0, 1), z_dir=(0.3826834324, 0.9238795325, 0)), keep=Keep.TOP)


with BuildPart() as f18_tool79:
    # F18_s80 → F18_t81 (new body)
    with BuildSketch(Plane.XY.offset(16.7)):
        with BuildLine():
            ThreePointArc((40.1859015546, -12.2103773999), (39.6564422799, -12.8237413852), (38.8464109423, -12.843533661))
            Line((38.8464109423, -12.843533661), (39.8518769876, -13.2600113334))
            ThreePointArc((39.8518769876, -13.2600113334), (40.0223304087, -12.7362894384), (40.1859015546, -12.2103773999))
        make_face()
    extrude(amount=-F18_T81_DEPTH)

    split(bisect_by=Plane.XY.offset(10), keep=Keep.BOTTOM)


with BuildPart() as f18_tool75_1:
    add(f18_tool75.part)

    # F18_t83: intersect F18_tool79
    add(f18_tool79.part, mode=Mode.INTERSECT)


with BuildPart() as f1_9:
    add(f1_8.part)

    # F18_t73: cut F18_tool75
    add(f18_tool75_1.part, mode=Mode.SUBTRACT)


with BuildPart() as f18_tool86:
    # F18_s87 → F18_t88 (revolve)
    with BuildSketch(Plane(origin=(0, 0, 0), x_dir=(0, 0, 1), z_dir=(0.2587091563, 0.9659552642, 0))):
        with BuildLine():
            ThreePointArc((9, 42), (9.7071067812, 41.7071067812), (10, 41))
            Line((10, 41), (10, 42))
            Line((10, 42), (9, 42))
        make_face()
    revolve(axis=Axis((0, 0, 10), (0, 0, -1)), revolution_arc=F18_T88_ANGLE)

    split(bisect_by=Plane(origin=(-1.1480502971, -2.7716385975, 0), x_dir=(0, 0, 1), z_dir=(-0.3826834324, -0.9238795325, 0)), keep=Keep.TOP)


with BuildPart() as f18_tool90:
    # F18_s91 → F18_t92 (new body)
    with BuildSketch(Plane.XY.offset(16.7)):
        with BuildLine():
            ThreePointArc((37.0497641576, -19.781682837), (37.1090937475, -18.9735847602), (36.5503103481, -18.386810856))
            Line((36.5503103481, -18.386810856), (37.5557763934, -18.8032885285))
            ThreePointArc((37.5557763934, -18.8032885285), (37.3059778599, -19.2941446018), (37.0497641576, -19.781682837))
        make_face()
    extrude(amount=-F18_T92_DEPTH)

    split(bisect_by=Plane.XY.offset(10), keep=Keep.BOTTOM)


with BuildPart() as f18_tool86_1:
    add(f18_tool86.part)

    # F18_t94: intersect F18_tool90
    add(f18_tool90.part, mode=Mode.INTERSECT)


with BuildPart() as f1_10:
    add(f1_9.part)

    # F18_t84: cut F18_tool86
    add(f18_tool86_1.part, mode=Mode.SUBTRACT)


with BuildPart() as f18_tool97:
    # F18_s98 → F18_t99 (revolve)
    with BuildSketch(Plane(origin=(0, 0, 0), x_dir=(0, 0, 1), z_dir=(0.2587091563, 0.9659552642, 0))):
        with BuildLine():
            ThreePointArc((17.7, 42), (16.9928932188, 41.7071067812), (16.7, 41))
            Line((16.7, 41), (16.7, 42))
            Line((16.7, 42), (17.7, 42))
        make_face()
    revolve(axis=Axis((0, 0, 16.7), (0, 0, -1)), revolution_arc=F18_T99_ANGLE)

    split(bisect_by=Plane(origin=(1.1480502971, 2.7716385975, 0), x_dir=(0, 0, 1), z_dir=(0.3826834324, 0.9238795325, 0)), keep=Keep.TOP)


with BuildPart() as f18_tool101:
    # F18_s102 → F18_t103 (new body)
    with BuildSketch(Plane.XY.offset(19.4537517655)):
        with BuildLine():
            ThreePointArc((40.1859015546, -12.2103773999), (39.6564422799, -12.8237413852), (38.8464109423, -12.843533661))
            Line((38.8464109423, -12.843533661), (39.8518769876, -13.2600113334))
            ThreePointArc((39.8518769876, -13.2600113334), (40.0223304087, -12.7362894384), (40.1859015546, -12.2103773999))
        make_face()
    extrude(amount=-F18_T103_DEPTH)

    split(bisect_by=Plane.XY.offset(16.7), keep=Keep.TOP)


with BuildPart() as f18_tool97_1:
    add(f18_tool97.part)

    # F18_t105: intersect F18_tool101
    add(f18_tool101.part, mode=Mode.INTERSECT)


with BuildPart() as f1_11:
    add(f1_10.part)

    # F18_t95: cut F18_tool97
    add(f18_tool97_1.part, mode=Mode.SUBTRACT)


with BuildPart() as f18_tool108:
    # F18_s109 → F18_t110 (new body)
    with BuildSketch(Plane.XY.offset(19.4537517655)):
        with BuildLine():
            ThreePointArc((37.0497641576, -19.781682837), (37.1090937475, -18.9735847602), (36.5503103481, -18.386810856))
            Line((36.5503103481, -18.386810856), (37.5557763934, -18.8032885285))
            ThreePointArc((37.5557763934, -18.8032885285), (37.3059778599, -19.2941446018), (37.0497641576, -19.781682837))
        make_face()
    extrude(amount=-F18_T110_DEPTH)

    split(bisect_by=Plane.XY.offset(16.7), keep=Keep.TOP)


with BuildPart() as f18_tool112:
    # F18_s113 → F18_t114 (revolve)
    with BuildSketch(Plane(origin=(0, 0, 0), x_dir=(0, 0, 1), z_dir=(0.2587091563, 0.9659552642, 0))):
        with BuildLine():
            ThreePointArc((17.7, 42), (16.9928932188, 41.7071067812), (16.7, 41))
            Line((16.7, 41), (16.7, 42))
            Line((16.7, 42), (17.7, 42))
        make_face()
    revolve(axis=Axis((0, 0, 16.7), (0, 0, -1)), revolution_arc=F18_T114_ANGLE)

    split(bisect_by=Plane(origin=(-1.1480502971, -2.7716385975, 0), x_dir=(0, 0, 1), z_dir=(-0.3826834324, -0.9238795325, 0)), keep=Keep.TOP)


with BuildPart() as f18_tool108_1:
    add(f18_tool108.part)

    # F18_t116: intersect F18_tool112
    add(f18_tool112.part, mode=Mode.INTERSECT)


with BuildPart() as f1_12:
    add(f1_11.part)

    # F18_t106: cut F18_tool108
    add(f18_tool108_1.part, mode=Mode.SUBTRACT)

    # F14 (on face) → F19 (cut)
    with BuildSketch(Plane(origin=(0, 0, 0), x_dir=(0.3826834324, 0.9238795325, 0), z_dir=(0.9238795325, -0.3826834324, 0))):
        Polygon((-3, 16.7), (3, 16.7), (5, 16.7), (5, 31.7), (-5, 31.7), (-5, 16.7), align=None)
    extrude(amount=F19_DEPTH, mode=Mode.SUBTRACT)


solid = f1_12.part
